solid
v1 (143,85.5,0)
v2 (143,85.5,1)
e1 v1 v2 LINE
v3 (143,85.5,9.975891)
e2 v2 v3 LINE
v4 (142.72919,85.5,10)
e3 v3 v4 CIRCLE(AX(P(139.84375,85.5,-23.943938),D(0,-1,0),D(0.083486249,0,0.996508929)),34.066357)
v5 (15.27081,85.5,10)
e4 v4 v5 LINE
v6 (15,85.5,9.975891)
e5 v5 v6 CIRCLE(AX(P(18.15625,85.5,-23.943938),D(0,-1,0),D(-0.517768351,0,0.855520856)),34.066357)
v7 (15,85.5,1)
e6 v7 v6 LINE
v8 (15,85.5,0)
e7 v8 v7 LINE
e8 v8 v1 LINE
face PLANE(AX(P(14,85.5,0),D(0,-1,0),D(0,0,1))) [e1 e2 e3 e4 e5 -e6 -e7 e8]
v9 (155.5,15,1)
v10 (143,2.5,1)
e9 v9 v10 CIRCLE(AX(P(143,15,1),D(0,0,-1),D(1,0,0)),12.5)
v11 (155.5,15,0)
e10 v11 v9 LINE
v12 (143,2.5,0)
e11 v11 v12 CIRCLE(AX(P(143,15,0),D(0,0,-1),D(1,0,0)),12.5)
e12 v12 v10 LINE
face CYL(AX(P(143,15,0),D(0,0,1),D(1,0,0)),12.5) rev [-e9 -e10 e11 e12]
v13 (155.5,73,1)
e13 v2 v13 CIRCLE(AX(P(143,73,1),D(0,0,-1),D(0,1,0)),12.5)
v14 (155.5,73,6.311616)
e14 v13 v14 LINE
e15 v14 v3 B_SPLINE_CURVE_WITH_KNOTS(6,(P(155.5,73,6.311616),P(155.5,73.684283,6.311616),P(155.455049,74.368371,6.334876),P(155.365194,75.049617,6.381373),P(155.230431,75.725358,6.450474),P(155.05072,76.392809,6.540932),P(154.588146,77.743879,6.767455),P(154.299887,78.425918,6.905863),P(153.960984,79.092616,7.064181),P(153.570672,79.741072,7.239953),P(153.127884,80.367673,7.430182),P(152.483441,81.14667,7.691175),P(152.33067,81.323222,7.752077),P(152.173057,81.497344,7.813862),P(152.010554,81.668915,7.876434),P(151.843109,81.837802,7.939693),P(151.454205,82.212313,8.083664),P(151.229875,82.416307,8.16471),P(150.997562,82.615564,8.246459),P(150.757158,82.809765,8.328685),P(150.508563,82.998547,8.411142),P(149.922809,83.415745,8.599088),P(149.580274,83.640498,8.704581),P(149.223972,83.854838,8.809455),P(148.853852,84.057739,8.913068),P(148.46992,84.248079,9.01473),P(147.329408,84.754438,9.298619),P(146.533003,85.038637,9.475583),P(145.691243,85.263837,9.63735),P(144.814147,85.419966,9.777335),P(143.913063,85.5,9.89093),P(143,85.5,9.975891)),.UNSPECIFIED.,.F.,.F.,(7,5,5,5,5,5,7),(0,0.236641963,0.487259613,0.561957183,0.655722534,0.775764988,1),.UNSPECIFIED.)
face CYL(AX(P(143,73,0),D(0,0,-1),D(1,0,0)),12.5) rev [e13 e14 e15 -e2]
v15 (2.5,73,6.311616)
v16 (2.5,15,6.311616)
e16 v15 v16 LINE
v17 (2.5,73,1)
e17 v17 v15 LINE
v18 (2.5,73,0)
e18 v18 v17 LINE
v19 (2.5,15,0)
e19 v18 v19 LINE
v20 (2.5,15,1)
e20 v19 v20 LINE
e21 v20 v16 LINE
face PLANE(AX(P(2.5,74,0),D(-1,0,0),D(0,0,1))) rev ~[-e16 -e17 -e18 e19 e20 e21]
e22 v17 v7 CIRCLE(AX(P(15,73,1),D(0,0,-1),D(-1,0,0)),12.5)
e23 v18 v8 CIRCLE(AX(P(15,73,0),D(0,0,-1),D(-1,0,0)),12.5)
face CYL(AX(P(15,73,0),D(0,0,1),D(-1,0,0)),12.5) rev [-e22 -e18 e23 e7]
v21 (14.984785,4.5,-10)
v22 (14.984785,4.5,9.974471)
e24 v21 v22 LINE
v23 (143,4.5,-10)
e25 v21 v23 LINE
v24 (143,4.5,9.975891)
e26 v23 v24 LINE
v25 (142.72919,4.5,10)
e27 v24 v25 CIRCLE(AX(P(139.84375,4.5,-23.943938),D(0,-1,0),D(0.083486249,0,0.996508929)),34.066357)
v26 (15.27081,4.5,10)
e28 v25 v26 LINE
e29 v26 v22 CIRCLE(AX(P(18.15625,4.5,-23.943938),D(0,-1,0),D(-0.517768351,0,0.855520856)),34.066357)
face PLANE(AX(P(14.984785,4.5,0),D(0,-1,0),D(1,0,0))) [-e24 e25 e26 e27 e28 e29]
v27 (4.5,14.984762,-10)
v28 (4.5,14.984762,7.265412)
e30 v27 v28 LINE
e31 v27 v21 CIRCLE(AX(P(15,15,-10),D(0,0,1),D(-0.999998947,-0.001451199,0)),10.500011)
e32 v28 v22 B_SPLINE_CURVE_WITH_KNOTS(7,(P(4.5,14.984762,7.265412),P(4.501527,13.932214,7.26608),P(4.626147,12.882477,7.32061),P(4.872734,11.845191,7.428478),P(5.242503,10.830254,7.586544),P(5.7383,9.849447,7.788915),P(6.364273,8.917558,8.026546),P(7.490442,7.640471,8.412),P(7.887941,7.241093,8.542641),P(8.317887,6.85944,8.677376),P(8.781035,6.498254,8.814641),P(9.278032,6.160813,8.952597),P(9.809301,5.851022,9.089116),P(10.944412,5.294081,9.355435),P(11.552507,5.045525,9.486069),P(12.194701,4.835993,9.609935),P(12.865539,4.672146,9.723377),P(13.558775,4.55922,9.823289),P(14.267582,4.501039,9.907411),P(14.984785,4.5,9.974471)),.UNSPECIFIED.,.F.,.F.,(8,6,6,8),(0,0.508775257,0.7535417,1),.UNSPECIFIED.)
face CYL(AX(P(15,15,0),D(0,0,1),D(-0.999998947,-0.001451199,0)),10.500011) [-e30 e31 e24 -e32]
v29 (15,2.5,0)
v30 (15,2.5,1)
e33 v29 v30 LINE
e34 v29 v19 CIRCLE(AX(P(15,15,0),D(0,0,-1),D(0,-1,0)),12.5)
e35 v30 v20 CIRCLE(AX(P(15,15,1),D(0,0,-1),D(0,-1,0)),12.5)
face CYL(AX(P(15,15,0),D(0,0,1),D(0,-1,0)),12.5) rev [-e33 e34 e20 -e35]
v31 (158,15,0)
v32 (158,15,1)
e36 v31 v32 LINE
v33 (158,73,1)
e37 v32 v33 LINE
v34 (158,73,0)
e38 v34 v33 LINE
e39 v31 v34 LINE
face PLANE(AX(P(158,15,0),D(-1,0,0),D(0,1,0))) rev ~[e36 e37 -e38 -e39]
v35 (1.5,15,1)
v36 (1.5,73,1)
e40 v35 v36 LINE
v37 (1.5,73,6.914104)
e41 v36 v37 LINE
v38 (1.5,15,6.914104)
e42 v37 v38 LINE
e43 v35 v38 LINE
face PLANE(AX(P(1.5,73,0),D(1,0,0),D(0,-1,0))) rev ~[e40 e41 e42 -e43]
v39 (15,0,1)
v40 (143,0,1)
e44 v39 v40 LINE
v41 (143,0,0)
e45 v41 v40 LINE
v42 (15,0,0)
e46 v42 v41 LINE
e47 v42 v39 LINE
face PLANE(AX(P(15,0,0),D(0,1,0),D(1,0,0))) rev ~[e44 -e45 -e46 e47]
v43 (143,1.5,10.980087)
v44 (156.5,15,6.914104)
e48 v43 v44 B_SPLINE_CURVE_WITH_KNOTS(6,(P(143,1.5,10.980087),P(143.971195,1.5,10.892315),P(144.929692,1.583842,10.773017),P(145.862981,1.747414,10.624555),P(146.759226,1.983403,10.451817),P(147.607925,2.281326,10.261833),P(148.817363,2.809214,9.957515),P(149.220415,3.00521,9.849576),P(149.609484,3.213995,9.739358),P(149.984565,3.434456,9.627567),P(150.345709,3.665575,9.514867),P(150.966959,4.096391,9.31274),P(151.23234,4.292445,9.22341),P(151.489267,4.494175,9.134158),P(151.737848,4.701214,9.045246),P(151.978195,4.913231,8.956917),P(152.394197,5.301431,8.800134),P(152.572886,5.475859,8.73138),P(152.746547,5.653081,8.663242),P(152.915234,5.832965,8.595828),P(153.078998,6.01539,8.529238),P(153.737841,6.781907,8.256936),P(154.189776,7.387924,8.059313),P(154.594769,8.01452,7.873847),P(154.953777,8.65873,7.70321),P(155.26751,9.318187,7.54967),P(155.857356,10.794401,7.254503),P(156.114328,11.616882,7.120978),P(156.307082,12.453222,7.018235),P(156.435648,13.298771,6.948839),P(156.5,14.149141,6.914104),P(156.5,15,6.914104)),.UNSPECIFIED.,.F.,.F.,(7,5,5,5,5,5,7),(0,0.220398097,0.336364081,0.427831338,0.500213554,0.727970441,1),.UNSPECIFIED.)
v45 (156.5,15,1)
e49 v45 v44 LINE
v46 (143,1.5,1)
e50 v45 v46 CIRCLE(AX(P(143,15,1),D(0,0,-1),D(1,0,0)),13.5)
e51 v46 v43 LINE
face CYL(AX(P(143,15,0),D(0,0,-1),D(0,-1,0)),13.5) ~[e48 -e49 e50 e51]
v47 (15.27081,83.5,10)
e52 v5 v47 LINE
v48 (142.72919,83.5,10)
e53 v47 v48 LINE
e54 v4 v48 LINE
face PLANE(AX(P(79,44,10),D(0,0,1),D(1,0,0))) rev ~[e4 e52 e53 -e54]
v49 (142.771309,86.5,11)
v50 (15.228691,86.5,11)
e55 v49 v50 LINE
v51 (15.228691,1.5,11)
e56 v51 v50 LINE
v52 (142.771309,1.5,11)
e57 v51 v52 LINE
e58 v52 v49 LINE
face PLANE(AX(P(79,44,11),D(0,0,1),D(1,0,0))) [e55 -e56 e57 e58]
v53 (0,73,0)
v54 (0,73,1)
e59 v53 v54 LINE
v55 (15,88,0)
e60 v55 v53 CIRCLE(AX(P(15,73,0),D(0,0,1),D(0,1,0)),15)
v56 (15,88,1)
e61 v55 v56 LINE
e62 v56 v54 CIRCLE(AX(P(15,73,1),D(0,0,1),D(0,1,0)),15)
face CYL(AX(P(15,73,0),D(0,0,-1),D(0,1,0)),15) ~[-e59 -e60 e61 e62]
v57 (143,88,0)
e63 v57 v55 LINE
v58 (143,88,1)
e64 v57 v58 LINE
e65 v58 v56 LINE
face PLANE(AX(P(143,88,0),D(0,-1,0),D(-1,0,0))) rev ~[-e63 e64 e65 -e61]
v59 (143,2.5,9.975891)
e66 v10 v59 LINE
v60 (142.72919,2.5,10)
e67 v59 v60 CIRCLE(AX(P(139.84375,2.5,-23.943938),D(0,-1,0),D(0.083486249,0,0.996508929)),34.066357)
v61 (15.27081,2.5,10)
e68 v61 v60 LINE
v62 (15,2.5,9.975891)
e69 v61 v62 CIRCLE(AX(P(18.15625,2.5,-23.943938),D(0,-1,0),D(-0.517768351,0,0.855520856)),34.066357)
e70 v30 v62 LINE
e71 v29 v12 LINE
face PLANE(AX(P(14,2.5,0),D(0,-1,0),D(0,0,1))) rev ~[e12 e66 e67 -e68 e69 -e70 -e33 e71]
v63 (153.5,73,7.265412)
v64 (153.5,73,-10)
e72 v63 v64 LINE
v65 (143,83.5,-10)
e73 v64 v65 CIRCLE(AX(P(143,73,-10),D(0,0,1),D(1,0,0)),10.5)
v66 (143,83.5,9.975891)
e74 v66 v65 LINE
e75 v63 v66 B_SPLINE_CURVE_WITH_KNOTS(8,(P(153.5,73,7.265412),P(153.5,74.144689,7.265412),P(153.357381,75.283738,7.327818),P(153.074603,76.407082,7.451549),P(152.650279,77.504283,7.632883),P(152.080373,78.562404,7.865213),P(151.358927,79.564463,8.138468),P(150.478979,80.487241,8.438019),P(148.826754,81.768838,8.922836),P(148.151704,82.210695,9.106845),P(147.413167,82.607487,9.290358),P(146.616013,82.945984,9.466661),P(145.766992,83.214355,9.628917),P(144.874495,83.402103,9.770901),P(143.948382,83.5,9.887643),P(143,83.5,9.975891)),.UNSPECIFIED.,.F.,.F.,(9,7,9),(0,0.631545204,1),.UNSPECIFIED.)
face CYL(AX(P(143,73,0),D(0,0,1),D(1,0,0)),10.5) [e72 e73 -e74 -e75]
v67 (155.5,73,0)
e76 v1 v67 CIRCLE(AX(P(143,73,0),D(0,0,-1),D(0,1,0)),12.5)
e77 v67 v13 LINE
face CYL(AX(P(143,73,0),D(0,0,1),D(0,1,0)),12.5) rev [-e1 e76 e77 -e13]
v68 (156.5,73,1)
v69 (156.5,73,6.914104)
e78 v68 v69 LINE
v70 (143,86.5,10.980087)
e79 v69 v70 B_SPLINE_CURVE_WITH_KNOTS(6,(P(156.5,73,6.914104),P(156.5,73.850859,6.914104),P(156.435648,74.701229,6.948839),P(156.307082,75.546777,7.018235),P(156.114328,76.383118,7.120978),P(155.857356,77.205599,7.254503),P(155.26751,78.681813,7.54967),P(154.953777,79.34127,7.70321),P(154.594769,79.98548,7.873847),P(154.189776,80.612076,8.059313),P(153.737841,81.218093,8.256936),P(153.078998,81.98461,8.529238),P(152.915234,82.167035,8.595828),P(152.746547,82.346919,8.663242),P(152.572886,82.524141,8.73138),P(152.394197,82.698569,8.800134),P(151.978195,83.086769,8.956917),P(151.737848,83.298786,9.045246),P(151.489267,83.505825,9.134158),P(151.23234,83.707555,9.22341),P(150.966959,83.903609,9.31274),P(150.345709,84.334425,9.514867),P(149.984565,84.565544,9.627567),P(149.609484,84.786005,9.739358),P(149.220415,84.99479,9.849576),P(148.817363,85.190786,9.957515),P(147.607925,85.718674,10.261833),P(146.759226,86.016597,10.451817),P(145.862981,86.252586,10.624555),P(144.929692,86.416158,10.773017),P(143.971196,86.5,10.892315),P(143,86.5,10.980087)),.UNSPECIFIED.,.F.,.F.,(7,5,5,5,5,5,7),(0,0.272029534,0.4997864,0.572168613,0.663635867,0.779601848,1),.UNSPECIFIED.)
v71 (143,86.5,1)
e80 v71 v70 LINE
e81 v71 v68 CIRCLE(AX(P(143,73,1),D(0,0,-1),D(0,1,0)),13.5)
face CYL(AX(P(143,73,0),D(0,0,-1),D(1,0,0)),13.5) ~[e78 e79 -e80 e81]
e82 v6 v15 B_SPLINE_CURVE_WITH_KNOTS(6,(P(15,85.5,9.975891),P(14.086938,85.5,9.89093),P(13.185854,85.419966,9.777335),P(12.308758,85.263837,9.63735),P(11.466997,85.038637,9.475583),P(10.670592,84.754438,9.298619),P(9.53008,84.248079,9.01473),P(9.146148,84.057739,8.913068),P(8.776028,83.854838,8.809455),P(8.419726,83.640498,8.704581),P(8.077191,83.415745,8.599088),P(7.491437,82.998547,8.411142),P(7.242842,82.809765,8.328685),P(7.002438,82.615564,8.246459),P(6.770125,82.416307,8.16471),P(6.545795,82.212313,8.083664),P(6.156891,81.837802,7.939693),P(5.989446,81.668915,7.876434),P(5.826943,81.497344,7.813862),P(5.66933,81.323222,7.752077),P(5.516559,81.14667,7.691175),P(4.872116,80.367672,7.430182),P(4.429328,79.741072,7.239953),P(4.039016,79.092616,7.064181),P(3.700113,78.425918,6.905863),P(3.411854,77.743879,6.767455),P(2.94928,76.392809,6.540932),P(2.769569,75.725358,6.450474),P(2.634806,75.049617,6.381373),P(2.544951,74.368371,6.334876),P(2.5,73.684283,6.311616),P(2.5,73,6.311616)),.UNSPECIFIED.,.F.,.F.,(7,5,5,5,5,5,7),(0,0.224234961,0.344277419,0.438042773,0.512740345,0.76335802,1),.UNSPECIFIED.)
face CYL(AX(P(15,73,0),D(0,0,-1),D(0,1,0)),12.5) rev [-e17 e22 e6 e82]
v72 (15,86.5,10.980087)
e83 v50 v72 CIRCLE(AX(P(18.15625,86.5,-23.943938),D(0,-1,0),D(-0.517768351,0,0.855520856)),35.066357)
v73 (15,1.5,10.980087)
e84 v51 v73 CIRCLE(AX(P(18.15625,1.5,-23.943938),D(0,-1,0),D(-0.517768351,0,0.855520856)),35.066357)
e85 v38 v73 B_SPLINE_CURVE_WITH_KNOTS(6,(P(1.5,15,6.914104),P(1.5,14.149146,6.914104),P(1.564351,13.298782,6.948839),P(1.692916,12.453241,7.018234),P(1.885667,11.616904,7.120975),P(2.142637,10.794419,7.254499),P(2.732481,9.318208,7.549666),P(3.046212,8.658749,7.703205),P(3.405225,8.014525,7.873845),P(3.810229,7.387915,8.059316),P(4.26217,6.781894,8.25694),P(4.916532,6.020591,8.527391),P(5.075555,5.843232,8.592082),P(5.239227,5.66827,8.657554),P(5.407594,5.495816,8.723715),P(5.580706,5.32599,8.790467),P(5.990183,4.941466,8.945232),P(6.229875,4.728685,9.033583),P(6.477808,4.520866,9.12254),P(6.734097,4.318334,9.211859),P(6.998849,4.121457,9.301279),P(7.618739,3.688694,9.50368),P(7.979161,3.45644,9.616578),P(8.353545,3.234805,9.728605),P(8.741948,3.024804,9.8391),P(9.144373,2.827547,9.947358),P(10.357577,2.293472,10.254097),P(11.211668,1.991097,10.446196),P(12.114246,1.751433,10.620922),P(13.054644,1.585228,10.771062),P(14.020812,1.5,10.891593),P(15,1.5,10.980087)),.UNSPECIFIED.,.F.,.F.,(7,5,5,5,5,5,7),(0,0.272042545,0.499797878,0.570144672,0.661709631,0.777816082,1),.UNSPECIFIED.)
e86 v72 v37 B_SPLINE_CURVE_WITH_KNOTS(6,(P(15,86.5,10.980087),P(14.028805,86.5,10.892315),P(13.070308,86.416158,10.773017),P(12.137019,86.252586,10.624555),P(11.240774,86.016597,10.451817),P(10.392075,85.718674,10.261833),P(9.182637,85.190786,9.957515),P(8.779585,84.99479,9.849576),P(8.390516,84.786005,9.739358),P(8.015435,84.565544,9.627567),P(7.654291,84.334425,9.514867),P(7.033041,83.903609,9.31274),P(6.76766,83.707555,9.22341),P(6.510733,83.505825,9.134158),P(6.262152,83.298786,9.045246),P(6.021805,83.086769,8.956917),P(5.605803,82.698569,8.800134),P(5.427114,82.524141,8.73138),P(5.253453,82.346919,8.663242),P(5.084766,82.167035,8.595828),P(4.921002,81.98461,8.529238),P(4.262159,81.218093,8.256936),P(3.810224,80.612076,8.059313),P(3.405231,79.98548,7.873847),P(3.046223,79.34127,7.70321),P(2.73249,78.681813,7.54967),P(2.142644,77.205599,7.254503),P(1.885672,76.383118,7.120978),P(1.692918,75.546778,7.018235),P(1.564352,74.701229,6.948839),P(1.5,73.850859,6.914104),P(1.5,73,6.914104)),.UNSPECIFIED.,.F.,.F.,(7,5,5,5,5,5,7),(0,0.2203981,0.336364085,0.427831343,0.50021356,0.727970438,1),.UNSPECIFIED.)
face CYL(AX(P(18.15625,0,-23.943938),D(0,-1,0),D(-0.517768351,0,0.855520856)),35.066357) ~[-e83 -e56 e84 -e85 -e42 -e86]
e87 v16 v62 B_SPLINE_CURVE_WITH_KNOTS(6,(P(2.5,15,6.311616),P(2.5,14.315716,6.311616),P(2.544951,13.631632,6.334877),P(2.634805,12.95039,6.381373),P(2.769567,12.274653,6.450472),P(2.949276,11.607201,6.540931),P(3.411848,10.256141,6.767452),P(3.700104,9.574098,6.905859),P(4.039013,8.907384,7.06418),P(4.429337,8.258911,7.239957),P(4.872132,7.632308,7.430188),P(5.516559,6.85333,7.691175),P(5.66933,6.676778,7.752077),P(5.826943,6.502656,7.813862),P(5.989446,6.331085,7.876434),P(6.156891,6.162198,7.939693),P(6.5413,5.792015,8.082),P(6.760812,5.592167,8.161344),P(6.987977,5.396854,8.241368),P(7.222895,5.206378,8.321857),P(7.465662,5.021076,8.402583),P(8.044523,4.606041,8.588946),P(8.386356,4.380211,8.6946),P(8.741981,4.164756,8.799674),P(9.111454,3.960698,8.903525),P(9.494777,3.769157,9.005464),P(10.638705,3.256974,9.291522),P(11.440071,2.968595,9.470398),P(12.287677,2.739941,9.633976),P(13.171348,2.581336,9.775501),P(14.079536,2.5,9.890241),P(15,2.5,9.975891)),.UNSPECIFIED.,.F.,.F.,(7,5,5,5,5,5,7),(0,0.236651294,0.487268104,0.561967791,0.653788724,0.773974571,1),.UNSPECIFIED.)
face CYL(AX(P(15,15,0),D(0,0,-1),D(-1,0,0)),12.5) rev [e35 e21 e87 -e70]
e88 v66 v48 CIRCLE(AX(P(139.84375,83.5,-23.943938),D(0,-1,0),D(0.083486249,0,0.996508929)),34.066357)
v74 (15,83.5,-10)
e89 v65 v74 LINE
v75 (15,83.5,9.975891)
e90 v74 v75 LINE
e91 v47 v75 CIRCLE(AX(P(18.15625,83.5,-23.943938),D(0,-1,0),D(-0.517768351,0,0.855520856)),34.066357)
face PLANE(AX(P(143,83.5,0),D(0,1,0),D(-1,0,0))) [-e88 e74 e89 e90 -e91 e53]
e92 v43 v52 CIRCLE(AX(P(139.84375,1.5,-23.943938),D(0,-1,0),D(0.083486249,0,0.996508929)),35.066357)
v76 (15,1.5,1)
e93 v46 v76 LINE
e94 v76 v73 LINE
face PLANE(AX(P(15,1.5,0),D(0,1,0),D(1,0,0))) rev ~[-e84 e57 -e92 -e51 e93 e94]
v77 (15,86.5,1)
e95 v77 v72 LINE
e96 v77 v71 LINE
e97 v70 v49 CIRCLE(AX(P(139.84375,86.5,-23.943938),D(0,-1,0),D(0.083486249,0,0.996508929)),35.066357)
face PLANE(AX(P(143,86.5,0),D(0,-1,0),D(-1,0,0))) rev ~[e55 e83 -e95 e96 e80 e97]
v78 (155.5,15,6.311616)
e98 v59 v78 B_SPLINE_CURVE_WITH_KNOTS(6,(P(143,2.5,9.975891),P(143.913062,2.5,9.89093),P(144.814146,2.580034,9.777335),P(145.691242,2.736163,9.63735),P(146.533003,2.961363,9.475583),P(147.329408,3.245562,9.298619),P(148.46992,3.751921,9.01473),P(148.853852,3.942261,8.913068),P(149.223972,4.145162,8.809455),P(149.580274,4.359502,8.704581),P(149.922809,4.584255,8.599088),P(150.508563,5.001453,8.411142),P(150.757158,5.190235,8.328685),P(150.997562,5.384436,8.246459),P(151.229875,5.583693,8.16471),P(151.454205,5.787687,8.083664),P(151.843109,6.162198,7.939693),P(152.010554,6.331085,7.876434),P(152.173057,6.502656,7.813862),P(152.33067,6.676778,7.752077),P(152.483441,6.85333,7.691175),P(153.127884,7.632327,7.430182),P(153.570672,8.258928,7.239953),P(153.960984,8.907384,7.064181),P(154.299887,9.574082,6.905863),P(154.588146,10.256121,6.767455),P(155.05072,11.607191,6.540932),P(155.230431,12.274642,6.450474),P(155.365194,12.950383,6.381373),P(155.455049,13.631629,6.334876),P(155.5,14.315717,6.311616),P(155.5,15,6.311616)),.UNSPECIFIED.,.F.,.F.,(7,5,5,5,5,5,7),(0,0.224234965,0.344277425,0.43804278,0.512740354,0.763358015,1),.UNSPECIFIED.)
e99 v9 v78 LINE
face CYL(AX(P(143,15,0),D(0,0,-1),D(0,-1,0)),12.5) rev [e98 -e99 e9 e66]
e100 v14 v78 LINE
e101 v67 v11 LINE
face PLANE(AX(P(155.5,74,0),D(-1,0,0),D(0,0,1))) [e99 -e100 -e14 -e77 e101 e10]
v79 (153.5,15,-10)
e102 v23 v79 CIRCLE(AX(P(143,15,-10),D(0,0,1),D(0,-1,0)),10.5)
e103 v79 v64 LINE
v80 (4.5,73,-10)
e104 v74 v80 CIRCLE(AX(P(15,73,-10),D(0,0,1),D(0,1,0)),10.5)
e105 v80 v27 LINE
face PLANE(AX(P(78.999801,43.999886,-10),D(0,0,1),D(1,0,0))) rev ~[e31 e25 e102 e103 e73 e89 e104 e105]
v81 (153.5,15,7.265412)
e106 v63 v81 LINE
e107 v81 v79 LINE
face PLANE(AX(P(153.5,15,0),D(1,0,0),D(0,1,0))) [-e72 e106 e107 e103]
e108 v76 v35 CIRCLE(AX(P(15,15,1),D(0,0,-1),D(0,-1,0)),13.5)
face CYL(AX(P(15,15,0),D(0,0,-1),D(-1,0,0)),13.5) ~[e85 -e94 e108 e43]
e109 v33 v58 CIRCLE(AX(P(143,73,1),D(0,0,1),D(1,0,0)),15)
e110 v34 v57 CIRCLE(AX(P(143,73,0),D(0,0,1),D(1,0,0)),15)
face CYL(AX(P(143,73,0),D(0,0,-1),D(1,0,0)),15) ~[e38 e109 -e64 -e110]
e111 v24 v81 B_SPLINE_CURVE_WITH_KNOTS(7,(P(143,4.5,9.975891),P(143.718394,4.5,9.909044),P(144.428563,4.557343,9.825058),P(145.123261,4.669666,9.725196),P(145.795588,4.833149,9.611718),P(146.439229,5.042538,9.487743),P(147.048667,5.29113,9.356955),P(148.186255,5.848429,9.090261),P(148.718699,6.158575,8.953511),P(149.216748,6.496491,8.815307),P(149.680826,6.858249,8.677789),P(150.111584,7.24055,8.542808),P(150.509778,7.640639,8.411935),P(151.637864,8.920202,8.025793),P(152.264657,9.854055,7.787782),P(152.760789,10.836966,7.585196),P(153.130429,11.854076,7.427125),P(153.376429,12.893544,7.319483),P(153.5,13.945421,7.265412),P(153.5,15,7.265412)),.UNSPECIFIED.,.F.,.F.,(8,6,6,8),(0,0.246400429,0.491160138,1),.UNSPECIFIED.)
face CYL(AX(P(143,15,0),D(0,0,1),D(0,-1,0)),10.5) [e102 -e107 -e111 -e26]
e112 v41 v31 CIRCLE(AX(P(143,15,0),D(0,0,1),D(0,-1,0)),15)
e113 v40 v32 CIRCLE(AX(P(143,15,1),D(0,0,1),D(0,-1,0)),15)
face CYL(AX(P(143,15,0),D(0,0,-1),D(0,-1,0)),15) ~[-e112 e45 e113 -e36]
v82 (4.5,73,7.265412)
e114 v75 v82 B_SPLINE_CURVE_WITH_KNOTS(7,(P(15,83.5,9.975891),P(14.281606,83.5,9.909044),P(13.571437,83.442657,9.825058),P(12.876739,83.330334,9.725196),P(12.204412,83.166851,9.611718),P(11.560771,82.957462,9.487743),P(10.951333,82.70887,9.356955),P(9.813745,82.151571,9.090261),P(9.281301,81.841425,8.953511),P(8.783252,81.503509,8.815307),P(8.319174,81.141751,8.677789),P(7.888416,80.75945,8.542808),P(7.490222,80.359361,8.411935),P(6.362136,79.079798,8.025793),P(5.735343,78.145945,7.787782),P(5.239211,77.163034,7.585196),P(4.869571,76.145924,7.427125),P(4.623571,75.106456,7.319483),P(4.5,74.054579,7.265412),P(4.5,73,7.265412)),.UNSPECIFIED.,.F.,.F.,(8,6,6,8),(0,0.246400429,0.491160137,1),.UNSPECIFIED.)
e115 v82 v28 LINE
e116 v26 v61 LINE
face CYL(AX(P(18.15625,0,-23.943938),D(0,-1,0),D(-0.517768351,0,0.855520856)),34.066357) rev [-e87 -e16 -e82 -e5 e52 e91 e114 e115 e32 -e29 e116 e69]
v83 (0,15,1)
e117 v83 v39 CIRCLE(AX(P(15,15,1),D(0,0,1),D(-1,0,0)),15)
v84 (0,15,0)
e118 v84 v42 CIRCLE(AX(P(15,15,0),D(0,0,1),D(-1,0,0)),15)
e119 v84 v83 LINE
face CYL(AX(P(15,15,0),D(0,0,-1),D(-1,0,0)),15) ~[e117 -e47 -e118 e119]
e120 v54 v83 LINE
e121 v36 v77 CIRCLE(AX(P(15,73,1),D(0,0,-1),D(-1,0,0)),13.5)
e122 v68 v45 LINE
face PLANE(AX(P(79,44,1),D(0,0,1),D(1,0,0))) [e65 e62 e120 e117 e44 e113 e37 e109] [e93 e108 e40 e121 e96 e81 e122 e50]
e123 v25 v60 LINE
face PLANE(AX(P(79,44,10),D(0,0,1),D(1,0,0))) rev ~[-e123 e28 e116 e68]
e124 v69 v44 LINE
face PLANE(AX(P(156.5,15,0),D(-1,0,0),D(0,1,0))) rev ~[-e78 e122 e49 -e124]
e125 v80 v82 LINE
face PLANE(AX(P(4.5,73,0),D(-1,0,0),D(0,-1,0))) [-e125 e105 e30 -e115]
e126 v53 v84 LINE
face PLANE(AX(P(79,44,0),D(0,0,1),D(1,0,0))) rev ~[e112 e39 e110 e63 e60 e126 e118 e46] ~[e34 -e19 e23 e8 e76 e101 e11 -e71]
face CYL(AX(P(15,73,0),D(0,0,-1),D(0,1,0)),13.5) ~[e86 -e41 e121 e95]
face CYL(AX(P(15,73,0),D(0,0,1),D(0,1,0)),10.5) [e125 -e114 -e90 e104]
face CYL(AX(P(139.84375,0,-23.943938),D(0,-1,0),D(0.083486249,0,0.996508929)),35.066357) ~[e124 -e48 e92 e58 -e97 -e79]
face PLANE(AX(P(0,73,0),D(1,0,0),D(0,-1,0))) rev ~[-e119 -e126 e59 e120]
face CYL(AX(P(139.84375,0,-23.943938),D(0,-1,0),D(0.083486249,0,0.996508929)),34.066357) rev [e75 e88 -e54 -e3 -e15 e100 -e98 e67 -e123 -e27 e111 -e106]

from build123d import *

# Parameters (mm, degrees)
F1_DEPTH     = 1
F2_DEPTH     = 11
F4_DEPTH     = 88.001
F5_T         = 1
F5_T3_DEPTH  = 130
F5_T5_DEPTH  = 60
F5_T8_ANGLE  = 90.000000001
F5_T10_ANGLE = 90.000000001
F5_T12_ANGLE = 90.000000001
F5_T14_ANGLE = 90.000000001
F8_DEPTH     = 10


# Not quite as in the source:
# - a shell that OpenCascade refuses in one call is made with other operations: the cavity is built on its own and cut out


with BuildPart() as f1:
    # F0 (on Top) → F1 (new body)
    with BuildSketch(Plane.XY):
        with BuildLine():
            ThreePointArc((0, 15), (4.3933982822, 4.3933982822), (15, 0))
            Line((15, 0), (143, 0))
            ThreePointArc((143, 0), (153.6066017178, 4.3933982822), (158, 15))
            Line((158, 15), (158, 73))
            ThreePointArc((158, 73), (153.6066017178, 83.6066017178), (143, 88))
            Line((143, 88), (15, 88))
            ThreePointArc((15, 88), (4.3933982822, 83.6066017178), (0, 73))
            Line((0, 73), (0, 15))
        make_face()
        with BuildLine():
            ThreePointArc((1.5, 73), (5.454058454, 82.545941546), (15, 86.5))
            Line((15, 86.5), (143, 86.5))
            ThreePointArc((143, 86.5), (152.545941546, 82.545941546), (156.5, 73))
            Line((156.5, 73), (156.5, 15))
            ThreePointArc((156.5, 15), (152.545941546, 5.454058454), (143, 1.5))
            Line((143, 1.5), (15, 1.5))
            ThreePointArc((15, 1.5), (5.454058454, 5.454058454), (1.5, 15))
            Line((1.5, 15), (1.5, 73))
        make_face(mode=Mode.SUBTRACT)
    extrude(amount=F1_DEPTH)

    # F0 (on Top) → F2 (join)
    with BuildSketch(Plane.XY):
        with BuildLine():
            Line((143, 86.5), (15, 86.5))
            ThreePointArc((15, 86.5), (5.454058454, 82.545941546), (1.5, 73))
            Line((1.5, 73), (1.5, 15))
            ThreePointArc((1.5, 15), (5.454058454, 5.454058454), (15, 1.5))
            Line((15, 1.5), (143, 1.5))
            ThreePointArc((143, 1.5), (152.545941546, 5.454058454), (156.5, 15))
            Line((156.5, 15), (156.5, 73))
            ThreePointArc((156.5, 73), (152.545941546, 82.545941546), (143, 86.5))
        make_face()
    extrude(amount=F2_DEPTH)

    # F3 (on Front) → F4 (cut, through all)
    with BuildSketch(Plane.XZ):
        with BuildLine():
            ThreePointArc((0, 6.0560618341), (7.3283980564, 9.4088283813), (15.2286913721, 11))
            ThreePointArc((15.2286913721, 11), (15.6141911349, 11.030157259), (16, 11.0560618341))
            Line((16, 11.0560618341), (0, 11.0560618341))
            Line((0, 11.0560618341), (0, 6.0560618341))
        make_face()
        with BuildLine():
            ThreePointArc((142, 11.0560618341), (142.3858088651, 11.030157259), (142.7713086279, 11))
            ThreePointArc((142.7713086279, 11), (150.6716019436, 9.4088283813), (158, 6.0560618341))
            Line((158, 6.0560618341), (158, 11.0560618341))
            Line((158, 11.0560618341), (142, 11.0560618341))
        make_face()
    extrude(amount=-F4_DEPTH, mode=Mode.SUBTRACT)

    # F5: shell of thickness 1, made by hand


with BuildPart() as f5_core1:
    # F5_t2: copy of F1
    add(f1.part)

    # the walls: a layer under each face that stays
    f5_faces = [f5_core1.faces().sort_by_distance(p)[0] for p in [
        (0, 44, 0.5),
        (4.3933982822, 83.6066017178, 0.5),
        (4.3933982822, 4.3933982822, 0.5),
        (133.3125, 1.0864197531, 1),
        (79, 88, 0.5),
        (79, 0, 0.5),
        (153.6066017178, 4.3933982822, 0.5),
        (158, 44, 0.5),
        (153.6066017178, 83.6066017178, 0.5),
        (5.454058454, 82.545941546, 5.9900432581),
        (79, 86.5, 6),
        (152.545941546, 82.545941546, 5.9900432581),
        (156.5, 44, 3.9570518678),
        (152.545941546, 5.454058454, 5.9900432581),
        (79, 1.5, 6),
        (5.454058454, 5.454058454, 5.9900432581),
        (1.5, 44, 3.9570518678),
        (8.1534990202, 44, 9.6655007895),
        (79, 44, 11),
        (149.8465009798, 44, 9.6655007895),
    ]]
    thicken(f5_faces, amount=-F5_T, mode=Mode.SUBTRACT)

    # F5_s4 → F5_t3 (cut)
    with BuildSketch(Plane.YZ.offset(14)):
        Polygon((86.51, 1.01), (86.5, 0), (85.5, 0), (85.5, 1), align=None)
        Polygon((1.49, 1.01), (1.5, 0), (2.5, 0), (2.5, 1), align=None)
    extrude(amount=F5_T3_DEPTH, mode=Mode.SUBTRACT)

    # F5_s6 → F5_t5 (cut)
    with BuildSketch(Plane.XZ.offset(-74)):
        Polygon((156.51, 1.01), (156.5, 0), (155.5, 0), (155.5, 1), align=None)
        Polygon((1.49, 1.01), (1.5, 0), (2.5, 0), (2.5, 1), align=None)
    extrude(amount=F5_T5_DEPTH, mode=Mode.SUBTRACT)

    # F5_s7 → F5_t8 (revolve, cut)
    with BuildSketch(Plane.XZ.offset(-73)):
        Polygon((1.49, 1.01), (1.5, 0), (2.5, 0), (2.5, 1), align=None)
    revolve(axis=Axis((15, 73, 1), (0, 0, -1)), revolution_arc=F5_T8_ANGLE, mode=Mode.SUBTRACT)

    # F5_s9 → F5_t10 (revolve, cut)
    with BuildSketch(Plane.YZ.offset(143)):
        Polygon((86.51, 1.01), (86.5, 0), (85.5, 0), (85.5, 1), align=None)
    revolve(axis=Axis((143, 73, 1), (0, 0, -1)), revolution_arc=F5_T10_ANGLE, mode=Mode.SUBTRACT)

    # F5_s11 → F5_t12 (revolve, cut)
    with BuildSketch(Plane.XZ.offset(-15)):
        Polygon((156.51, 1.01), (156.5, 0), (155.5, 0), (155.5, 1), align=None)
    revolve(axis=Axis((143, 15, 1), (0, 0, -1)), revolution_arc=F5_T12_ANGLE, mode=Mode.SUBTRACT)

    # F5_s13 → F5_t14 (revolve, cut)
    with BuildSketch(Plane.YZ.offset(15)):
        Polygon((1.49, 1.01), (1.5, 0), (2.5, 0), (2.5, 1), align=None)
    revolve(axis=Axis((15, 15, 1), (0, 0, -1)), revolution_arc=F5_T14_ANGLE, mode=Mode.SUBTRACT)


with BuildPart() as f1_1:
    add(f1.part)

    # what is left inside the walls is the cavity
    f5_cavity = [f5_core1.part.solids().sort_by_distance(p)[0] for p in [
        (79, 30.166667, 0.01),
    ]]
    add(f5_cavity, mode=Mode.SUBTRACT)

    # F6 (on Top) → F7 (join, up to the next surface of F1)
    with BuildSketch(Plane.XY):
        with BuildLine():
            Line((143, 83.5), (15, 83.5))
            ThreePointArc((15, 83.5), (7.5753787975, 80.4246212025), (4.5, 73))
            Line((4.5000000324, 73), (4.5000000324, 14.9847623929))
            ThreePointArc((4.5000000324, 14.9847623929), (7.5753788898, 7.5753631149), (14.9847847018, 4.5))
            Line((14.9847847018, 4.5), (143, 4.5))
            ThreePointArc((143, 4.5), (150.4246212025, 7.5753787975), (153.5, 15))
            Line((153.5, 15), (153.5, 73))
            ThreePointArc((153.5, 73), (150.4246212025, 80.4246212025), (143, 83.5))
        make_face()
    extrude(until=Until.NEXT)

    # F6 (on Top) → F8 (join)
    with BuildSketch(Plane.XY):
        with BuildLine():
            Line((143, 83.5), (15, 83.5))
            ThreePointArc((15, 83.5), (7.5753787975, 80.4246212025), (4.5, 73))
            Line((4.5000000324, 73), (4.5000000324, 14.9847623929))
            ThreePointArc((4.5000000324, 14.9847623929), (7.5753788898, 7.5753631149), (14.9847847018, 4.5))
            Line((14.9847847018, 4.5), (143, 4.5))
            ThreePointArc((143, 4.5), (150.4246212025, 7.5753787975), (153.5, 15))
            Line((153.5, 15), (153.5, 73))
            ThreePointArc((153.5, 73), (150.4246212025, 80.4246212025), (143, 83.5))
        make_face()
    extrude(amount=-F8_DEPTH)


solid = f1_1.part
